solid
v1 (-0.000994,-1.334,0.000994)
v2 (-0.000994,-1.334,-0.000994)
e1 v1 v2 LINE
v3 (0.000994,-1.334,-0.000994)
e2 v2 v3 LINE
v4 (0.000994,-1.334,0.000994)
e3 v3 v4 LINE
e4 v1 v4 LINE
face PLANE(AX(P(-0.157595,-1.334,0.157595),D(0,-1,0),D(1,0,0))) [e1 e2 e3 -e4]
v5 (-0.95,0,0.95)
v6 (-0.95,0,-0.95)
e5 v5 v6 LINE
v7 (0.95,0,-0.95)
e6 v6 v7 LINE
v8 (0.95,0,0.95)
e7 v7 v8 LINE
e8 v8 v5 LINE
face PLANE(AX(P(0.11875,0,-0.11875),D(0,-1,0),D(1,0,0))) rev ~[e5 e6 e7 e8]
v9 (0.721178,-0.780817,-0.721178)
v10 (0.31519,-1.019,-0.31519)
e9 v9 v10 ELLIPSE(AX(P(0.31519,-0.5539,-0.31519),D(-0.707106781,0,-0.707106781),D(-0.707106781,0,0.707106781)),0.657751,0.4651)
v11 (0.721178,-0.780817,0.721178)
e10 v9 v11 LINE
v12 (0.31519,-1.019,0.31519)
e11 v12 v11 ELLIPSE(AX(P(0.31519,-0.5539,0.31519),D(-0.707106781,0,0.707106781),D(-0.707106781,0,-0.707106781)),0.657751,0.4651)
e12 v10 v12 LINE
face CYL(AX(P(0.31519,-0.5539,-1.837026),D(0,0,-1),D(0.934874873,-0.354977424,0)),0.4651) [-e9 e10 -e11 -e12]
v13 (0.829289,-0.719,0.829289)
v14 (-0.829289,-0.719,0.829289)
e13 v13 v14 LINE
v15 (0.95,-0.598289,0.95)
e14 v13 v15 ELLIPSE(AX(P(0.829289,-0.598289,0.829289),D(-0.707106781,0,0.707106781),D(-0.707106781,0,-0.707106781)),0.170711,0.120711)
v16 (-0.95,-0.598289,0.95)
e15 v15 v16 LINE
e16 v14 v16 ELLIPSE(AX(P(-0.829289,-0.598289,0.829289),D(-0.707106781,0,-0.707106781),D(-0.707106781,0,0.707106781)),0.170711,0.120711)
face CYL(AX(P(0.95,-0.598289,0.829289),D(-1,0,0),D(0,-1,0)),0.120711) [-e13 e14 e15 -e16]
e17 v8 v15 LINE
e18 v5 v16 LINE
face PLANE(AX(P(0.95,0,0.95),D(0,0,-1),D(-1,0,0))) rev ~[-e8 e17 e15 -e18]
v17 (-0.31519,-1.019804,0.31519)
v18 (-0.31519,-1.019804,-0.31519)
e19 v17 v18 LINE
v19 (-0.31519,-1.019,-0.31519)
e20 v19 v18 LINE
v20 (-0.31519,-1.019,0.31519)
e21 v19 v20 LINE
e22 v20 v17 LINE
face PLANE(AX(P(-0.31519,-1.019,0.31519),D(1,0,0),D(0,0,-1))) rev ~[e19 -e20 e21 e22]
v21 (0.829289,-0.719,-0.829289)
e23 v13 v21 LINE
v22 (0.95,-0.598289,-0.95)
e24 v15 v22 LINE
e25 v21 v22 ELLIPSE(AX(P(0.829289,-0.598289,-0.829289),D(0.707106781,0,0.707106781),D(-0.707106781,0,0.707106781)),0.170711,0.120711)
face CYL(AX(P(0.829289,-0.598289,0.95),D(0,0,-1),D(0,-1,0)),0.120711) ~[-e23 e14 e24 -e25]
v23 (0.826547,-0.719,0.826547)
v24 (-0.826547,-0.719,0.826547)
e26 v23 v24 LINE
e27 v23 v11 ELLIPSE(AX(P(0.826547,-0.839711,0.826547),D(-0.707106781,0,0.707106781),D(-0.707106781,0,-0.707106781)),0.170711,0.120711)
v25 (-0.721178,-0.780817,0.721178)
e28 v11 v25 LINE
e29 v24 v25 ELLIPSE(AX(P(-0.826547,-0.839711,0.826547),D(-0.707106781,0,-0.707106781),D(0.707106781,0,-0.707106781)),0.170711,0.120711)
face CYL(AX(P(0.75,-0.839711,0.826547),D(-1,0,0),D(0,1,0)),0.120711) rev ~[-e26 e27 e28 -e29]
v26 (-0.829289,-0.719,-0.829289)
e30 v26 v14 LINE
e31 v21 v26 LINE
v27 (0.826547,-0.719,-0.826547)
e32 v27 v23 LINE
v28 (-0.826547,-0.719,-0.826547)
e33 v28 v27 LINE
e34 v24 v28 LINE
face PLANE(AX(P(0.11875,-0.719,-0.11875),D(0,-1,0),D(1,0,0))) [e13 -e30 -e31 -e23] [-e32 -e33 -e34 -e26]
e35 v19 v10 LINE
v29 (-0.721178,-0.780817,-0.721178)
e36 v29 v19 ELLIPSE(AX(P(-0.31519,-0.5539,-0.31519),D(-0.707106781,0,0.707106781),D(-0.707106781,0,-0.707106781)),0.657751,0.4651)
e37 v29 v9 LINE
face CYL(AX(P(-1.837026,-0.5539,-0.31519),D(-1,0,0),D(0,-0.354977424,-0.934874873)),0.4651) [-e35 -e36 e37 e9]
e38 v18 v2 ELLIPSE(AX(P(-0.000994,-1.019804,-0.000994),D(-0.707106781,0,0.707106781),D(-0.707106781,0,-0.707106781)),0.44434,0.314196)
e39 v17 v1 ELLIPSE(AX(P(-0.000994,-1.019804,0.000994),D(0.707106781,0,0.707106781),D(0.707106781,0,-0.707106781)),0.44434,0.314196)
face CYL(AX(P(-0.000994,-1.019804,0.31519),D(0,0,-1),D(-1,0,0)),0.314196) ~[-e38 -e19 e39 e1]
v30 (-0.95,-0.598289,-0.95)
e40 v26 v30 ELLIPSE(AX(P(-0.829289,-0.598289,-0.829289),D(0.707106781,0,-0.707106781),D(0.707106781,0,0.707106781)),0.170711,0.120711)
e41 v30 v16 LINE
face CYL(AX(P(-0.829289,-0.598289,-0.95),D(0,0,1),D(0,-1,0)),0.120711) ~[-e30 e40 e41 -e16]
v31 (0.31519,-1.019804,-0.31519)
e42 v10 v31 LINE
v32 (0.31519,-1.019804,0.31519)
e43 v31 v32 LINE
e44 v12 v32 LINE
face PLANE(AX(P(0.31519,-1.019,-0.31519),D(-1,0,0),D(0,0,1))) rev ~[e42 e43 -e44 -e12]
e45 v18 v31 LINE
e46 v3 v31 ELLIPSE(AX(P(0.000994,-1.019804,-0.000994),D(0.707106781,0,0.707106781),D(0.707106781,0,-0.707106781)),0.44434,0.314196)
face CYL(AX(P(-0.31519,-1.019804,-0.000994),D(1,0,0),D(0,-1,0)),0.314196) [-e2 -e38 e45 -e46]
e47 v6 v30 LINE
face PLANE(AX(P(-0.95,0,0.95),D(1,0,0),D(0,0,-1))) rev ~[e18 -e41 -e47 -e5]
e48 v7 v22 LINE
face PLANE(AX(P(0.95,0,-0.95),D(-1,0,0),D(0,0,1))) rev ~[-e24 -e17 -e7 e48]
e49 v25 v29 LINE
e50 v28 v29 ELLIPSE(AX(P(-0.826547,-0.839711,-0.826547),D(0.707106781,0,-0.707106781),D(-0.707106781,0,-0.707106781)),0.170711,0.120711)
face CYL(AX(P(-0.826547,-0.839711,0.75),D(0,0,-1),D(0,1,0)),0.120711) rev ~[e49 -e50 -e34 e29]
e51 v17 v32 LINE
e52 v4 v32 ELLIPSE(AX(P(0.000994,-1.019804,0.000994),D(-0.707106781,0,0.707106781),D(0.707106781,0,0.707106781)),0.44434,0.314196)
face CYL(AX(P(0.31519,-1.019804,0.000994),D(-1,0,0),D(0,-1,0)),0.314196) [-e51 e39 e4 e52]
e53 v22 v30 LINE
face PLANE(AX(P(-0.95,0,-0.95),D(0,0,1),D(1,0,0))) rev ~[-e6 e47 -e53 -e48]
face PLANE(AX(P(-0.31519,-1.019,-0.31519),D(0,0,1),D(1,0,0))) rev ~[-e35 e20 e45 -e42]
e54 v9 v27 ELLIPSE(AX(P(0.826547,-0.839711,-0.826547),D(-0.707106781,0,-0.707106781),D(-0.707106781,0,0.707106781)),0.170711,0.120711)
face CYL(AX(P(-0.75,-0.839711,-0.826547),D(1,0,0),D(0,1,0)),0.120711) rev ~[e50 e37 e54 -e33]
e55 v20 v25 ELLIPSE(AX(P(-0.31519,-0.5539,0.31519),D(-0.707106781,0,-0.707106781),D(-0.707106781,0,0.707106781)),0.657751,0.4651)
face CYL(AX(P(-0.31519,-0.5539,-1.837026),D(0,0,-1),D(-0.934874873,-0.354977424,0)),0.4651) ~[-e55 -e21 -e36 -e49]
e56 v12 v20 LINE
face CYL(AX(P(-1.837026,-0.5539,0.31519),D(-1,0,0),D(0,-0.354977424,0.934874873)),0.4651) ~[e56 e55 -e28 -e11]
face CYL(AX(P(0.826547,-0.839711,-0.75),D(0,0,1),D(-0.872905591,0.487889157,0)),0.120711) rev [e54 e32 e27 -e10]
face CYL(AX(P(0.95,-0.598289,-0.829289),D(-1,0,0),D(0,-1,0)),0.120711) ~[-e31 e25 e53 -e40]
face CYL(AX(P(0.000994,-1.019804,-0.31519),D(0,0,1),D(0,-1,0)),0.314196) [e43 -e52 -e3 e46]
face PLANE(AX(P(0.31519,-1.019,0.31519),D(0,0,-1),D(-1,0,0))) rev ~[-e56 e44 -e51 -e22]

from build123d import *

# Parameters (mm, degrees)
F0_W        = 0.95
F0_H        = 0.95
F1_DEPTH    = 0.719
F2_W        = 0.75
F2_H        = 0.75
F3_DEPTH    = 0.3
F4_T1_DEPTH = 3.6740515173
F4_T3_DEPTH = 3.6740515173
F5_W        = 0.3151896965
F5_H        = 0.3151896965
F6_DEPTH    = 0.315
F7_R        = 0.314196
F8_R        = 0.1207106781


# Not quite as in the source:
# - a fillet or chamfer that OpenCascade refuses, or shapes differently, is made with other operations: its cross-section is extruded or revolved along the edge and cut away or added
# - a fillet or chamfer is up to 0.001 mm smaller than in the source, because OpenCascade refuses the exact size


with BuildPart() as f1:
    # F0 (on Front) → F1 (new body)
    with BuildSketch(Plane.XZ):
        Polygon((0, 0.95), (0, 0), (-0.95, 0), (-0.95, -0.95), (0, -0.95), (0.95, -0.95), (0.95, 0), (0.95, 0.95), align=None)
        with Locations((-0.475, 0.475)):
            Rectangle(F0_W, F0_H)
    extrude(amount=F1_DEPTH)

    # F2 (on face) → F3 (join)
    with BuildSketch(Plane.XZ.offset(0.719)):
        Polygon((0, 0.75), (0, 0), (-0.75, 0), (-0.75, -0.75), (0, -0.75), (0.75, -0.75), (0.75, 0), (0.75, 0.75), align=None)
        with Locations((-0.375, 0.375)):
            Rectangle(F2_W, F2_H)
    extrude(amount=F3_DEPTH)

    # F4: fillet of radius 0.4651 on 4 edges, made by hand

    # F4_s2 → F4_t1 (cut)
    with BuildSketch(Plane.YZ.offset(-1.8370257587)):
        with BuildLine():
            ThreePointArc((-0.719, -0.75), (-0.9367224262, -0.579320346), (-1.019, -0.3151896965))
            Line((-1.019, -0.3151896965), (-1.019, -0.75))
            Line((-1.019, -0.75), (-0.719, -0.75))
        make_face()
        with BuildLine():
            ThreePointArc((-0.719, 0.75), (-0.9367224262, 0.579320346), (-1.019, 0.3151896965))
            Line((-1.019, 0.3151896965), (-1.019, 0.75))
            Line((-1.019, 0.75), (-0.719, 0.75))
        make_face()
    extrude(amount=F4_T1_DEPTH, mode=Mode.SUBTRACT)

    # F4_s4 → F4_t3 (cut)
    with BuildSketch(Plane.XY.offset(-1.8370257587)):
        with BuildLine():
            ThreePointArc((0.75, -0.719), (0.579320346, -0.9367224262), (0.3151896965, -1.019))
            Line((0.3151896965, -1.019), (0.75, -1.019))
            Line((0.75, -1.019), (0.75, -0.719))
        make_face()
        with BuildLine():
            ThreePointArc((-0.75, -0.719), (-0.579320346, -0.9367224262), (-0.3151896965, -1.019))
            Line((-0.3151896965, -1.019), (-0.75, -1.019))
            Line((-0.75, -1.019), (-0.75, -0.719))
        make_face()
    extrude(amount=F4_T3_DEPTH, mode=Mode.SUBTRACT)

    # F5 (on face) → F6 (join)
    with BuildSketch(Plane.XZ.offset(1.019)):
        with Locations((-0.1575948483, 0.1575948483)):
            Rectangle(F5_W, F5_H)
        Polygon((0.3151896965, 0.3151896965), (0, 0.3151896965), (0, 0), (-0.3151896965, 0), (-0.3151896965, -0.3151896965), (0, -0.3151896965), (0.3151896965, -0.3151896965), (0.3151896965, 0), align=None)
    extrude(amount=F6_DEPTH)

    # F7 (radius 0.315196 in the source; OpenCascade refuses exactly that, so slightly less here)
    f7_edges = [f1.edges().sort_by_distance(p)[0] for p in [
        (-0.31519, -1.334, 0),
        (0, -1.334, -0.31519),
        (0.31519, -1.334, 0),
        (0, -1.334, 0.31519),
    ]]
    fillet(f7_edges, radius=F7_R)

    # F8
    f8_edges = [f1.edges().sort_by_distance(p)[0] for p in [
        (-0.95, -0.719, 0),
        (0, -0.719, -0.95),
        (0.95, -0.719, 0),
        (0, -0.719, 0.95),
        (-0.75, -0.719, 0),
        (0, -0.719, 0.75),
        (0.75, -0.719, 0),
        (0, -0.719, -0.75),
    ]]
    fillet(f8_edges, radius=F8_R)


solid = f1.part
